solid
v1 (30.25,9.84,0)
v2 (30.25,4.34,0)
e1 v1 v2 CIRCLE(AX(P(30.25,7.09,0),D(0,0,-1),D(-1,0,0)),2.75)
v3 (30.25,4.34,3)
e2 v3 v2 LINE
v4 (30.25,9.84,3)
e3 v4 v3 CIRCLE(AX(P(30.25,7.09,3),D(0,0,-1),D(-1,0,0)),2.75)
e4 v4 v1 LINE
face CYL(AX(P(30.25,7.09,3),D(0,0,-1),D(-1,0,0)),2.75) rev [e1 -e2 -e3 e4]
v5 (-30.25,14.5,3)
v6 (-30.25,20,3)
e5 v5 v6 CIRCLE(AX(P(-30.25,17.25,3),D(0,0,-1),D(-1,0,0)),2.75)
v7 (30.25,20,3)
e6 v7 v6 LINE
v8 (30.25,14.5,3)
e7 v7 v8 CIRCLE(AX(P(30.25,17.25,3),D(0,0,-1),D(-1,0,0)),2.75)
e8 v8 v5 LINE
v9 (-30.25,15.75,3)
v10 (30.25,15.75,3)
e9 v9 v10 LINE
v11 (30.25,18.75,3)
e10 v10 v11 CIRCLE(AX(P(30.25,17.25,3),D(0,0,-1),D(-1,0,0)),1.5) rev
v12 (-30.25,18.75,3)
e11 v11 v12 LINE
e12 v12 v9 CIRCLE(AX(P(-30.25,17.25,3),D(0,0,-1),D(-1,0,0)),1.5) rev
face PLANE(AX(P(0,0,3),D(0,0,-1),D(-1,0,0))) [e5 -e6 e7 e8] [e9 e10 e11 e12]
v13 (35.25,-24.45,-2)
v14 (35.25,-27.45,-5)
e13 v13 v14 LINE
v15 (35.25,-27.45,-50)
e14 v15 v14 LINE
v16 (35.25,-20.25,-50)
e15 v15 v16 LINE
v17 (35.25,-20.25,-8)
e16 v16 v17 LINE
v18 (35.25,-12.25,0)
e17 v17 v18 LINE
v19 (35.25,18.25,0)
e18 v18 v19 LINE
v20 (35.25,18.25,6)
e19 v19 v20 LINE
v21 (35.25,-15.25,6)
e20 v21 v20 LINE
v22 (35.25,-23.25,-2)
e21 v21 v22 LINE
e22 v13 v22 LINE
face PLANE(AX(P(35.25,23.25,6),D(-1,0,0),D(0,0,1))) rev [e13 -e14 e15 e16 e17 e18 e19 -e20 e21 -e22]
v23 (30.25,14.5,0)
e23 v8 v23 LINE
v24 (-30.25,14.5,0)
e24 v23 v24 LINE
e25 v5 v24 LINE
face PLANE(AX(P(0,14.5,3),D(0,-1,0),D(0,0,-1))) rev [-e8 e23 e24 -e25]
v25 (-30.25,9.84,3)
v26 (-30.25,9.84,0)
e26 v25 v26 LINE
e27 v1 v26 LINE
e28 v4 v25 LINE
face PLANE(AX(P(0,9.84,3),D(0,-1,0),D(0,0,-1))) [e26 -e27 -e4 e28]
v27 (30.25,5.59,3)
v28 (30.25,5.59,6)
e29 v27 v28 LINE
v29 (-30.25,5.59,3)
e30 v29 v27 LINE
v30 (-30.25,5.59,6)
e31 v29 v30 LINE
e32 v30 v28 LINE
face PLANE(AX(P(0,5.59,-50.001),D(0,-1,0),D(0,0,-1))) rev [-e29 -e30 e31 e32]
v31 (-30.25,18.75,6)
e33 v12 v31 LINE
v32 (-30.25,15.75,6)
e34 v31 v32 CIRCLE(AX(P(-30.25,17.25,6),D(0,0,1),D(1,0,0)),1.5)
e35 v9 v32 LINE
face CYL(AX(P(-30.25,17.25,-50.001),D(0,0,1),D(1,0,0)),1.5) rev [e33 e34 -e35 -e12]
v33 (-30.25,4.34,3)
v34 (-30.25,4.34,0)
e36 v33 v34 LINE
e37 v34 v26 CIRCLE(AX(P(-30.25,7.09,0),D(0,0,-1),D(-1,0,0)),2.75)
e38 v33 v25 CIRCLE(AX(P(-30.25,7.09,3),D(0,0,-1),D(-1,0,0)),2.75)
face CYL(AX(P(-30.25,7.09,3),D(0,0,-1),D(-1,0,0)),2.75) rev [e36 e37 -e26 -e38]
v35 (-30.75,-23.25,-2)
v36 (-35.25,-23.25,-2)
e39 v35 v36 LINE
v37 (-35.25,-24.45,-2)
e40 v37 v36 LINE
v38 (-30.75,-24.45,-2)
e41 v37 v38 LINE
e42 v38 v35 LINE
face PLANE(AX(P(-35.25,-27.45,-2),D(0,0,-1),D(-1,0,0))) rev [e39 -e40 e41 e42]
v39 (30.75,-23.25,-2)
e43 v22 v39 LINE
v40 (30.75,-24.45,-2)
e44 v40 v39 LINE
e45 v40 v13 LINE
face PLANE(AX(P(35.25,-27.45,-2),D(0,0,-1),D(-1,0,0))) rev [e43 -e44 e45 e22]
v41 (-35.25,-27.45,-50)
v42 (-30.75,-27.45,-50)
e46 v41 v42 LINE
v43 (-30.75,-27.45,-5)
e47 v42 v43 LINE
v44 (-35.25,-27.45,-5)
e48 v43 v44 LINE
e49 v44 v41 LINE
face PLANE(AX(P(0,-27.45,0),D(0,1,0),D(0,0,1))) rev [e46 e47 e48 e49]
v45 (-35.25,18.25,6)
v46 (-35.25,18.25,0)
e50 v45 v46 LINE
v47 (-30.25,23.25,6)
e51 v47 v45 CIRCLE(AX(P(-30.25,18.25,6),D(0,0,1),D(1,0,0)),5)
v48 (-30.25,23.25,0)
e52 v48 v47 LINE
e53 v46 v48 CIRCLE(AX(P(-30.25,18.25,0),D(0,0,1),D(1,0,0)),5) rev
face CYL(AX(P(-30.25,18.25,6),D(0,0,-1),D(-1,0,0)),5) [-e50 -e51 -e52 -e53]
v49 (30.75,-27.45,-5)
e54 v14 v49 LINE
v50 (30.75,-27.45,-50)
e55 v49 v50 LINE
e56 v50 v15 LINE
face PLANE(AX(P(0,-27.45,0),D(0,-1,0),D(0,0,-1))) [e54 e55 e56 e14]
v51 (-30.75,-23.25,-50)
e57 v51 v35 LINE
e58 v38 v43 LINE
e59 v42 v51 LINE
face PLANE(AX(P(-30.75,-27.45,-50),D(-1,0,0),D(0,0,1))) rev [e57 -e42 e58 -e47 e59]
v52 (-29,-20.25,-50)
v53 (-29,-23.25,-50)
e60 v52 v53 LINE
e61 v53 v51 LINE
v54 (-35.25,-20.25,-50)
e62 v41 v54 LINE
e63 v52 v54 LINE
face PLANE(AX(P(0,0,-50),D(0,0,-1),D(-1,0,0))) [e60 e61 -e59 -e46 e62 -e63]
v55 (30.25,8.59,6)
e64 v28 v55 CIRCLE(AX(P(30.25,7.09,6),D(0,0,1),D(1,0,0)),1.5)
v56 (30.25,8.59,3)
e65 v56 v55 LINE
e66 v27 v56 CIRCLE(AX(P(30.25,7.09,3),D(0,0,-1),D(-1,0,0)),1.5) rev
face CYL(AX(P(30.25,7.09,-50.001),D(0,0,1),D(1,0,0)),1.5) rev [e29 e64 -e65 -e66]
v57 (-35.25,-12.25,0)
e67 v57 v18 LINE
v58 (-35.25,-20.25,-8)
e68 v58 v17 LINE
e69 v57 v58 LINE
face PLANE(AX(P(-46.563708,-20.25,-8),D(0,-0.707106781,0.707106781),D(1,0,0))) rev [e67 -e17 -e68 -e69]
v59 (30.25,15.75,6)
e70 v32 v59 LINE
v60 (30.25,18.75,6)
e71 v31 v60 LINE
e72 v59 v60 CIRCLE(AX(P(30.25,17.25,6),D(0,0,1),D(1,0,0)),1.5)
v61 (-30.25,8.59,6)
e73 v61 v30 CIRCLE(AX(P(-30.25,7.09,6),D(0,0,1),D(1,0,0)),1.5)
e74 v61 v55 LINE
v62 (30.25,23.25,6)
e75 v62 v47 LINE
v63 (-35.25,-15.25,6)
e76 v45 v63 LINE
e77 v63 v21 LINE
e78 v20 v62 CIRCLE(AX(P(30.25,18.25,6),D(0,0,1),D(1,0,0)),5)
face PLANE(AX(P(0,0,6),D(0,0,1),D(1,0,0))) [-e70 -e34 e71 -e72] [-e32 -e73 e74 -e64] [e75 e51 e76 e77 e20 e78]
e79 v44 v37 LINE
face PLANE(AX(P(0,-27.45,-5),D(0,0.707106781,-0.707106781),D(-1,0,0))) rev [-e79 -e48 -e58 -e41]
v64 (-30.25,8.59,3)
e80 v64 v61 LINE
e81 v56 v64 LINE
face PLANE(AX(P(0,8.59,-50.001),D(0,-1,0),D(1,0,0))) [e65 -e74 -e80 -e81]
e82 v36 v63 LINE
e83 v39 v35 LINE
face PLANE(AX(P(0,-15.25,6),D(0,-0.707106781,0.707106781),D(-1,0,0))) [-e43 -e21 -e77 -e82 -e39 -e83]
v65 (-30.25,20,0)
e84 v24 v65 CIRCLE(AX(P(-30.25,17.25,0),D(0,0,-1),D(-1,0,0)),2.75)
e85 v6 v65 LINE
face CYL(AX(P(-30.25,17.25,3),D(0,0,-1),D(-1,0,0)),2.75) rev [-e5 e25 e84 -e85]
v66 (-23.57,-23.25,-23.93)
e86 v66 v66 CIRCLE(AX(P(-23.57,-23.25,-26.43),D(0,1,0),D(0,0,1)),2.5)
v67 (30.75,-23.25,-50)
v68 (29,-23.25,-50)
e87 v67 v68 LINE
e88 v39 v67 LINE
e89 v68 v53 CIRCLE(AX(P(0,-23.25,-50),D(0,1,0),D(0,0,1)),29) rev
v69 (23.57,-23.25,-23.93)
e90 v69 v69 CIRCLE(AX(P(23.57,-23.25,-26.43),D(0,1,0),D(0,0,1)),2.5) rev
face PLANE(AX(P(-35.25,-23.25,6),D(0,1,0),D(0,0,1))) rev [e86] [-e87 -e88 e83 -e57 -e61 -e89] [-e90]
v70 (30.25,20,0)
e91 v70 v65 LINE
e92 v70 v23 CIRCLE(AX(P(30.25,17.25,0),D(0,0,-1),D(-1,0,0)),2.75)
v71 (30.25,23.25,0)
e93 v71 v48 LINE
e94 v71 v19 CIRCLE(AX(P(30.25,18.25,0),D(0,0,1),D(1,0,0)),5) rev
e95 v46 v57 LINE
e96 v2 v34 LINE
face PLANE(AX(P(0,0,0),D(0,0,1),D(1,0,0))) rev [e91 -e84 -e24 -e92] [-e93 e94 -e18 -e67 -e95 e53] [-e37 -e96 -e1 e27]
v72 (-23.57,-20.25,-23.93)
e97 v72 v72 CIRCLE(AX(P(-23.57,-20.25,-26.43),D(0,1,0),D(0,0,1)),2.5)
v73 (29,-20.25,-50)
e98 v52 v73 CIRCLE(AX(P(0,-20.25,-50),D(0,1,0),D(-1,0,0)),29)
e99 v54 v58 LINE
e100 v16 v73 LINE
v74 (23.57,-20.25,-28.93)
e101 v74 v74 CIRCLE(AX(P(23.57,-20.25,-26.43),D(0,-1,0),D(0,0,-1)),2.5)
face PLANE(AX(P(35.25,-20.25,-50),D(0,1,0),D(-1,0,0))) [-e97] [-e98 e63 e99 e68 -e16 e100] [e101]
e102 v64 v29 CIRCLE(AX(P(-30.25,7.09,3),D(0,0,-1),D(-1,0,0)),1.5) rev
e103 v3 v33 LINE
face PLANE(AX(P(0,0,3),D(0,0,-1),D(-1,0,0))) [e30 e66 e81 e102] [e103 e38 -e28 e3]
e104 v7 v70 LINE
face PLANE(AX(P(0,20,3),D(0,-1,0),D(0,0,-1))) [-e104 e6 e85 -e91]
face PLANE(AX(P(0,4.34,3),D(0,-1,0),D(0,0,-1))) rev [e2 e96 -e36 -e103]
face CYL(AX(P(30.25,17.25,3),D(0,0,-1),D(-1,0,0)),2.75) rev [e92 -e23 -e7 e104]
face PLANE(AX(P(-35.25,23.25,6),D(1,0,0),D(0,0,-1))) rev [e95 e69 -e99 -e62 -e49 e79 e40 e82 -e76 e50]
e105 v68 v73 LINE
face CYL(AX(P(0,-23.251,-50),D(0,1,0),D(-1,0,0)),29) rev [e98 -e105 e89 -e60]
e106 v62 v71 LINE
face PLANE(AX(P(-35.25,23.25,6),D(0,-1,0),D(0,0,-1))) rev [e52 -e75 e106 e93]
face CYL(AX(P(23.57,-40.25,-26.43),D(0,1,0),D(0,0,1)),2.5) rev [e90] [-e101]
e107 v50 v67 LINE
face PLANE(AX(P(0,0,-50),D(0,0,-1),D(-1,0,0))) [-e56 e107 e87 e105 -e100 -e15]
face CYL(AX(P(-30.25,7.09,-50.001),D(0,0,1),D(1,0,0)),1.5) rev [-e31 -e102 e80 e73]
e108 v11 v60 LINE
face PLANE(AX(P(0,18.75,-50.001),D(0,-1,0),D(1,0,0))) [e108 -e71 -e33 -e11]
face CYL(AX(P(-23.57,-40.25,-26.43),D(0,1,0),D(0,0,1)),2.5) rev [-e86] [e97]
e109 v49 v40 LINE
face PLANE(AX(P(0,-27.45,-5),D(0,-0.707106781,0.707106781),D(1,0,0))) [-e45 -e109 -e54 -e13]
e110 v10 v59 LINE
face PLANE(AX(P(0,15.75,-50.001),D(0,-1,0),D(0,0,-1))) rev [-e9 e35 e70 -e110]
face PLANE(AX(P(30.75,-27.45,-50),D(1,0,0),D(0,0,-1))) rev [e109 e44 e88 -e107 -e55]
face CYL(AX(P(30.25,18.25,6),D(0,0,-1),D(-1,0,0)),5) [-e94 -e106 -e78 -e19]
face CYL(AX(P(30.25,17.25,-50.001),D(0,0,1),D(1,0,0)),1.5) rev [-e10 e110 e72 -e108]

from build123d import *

# Parameters (mm, degrees)
SKETCH1_W           = 70.5
SKETCH1_H           = 46.5
BOSS_EXTRUDE1_DEPTH = 6
SKETCH2_W           = 70.5
SKETCH2_H           = 3
BOSS_EXTRUDE2_DEPTH = 50
CUT_EXTRUDE1_REACH  = 77.065
SKETCH3_R           = 29
SKETCH4_W           = 8
SKETCH4_H           = 8
BOSS_EXTRUDE3_DEPTH = 70.5
CHAMFER1_SIZE       = 8
SKETCH5_R           = 2.5
CUT_EXTRUDE2_DEPTH  = 20
SKETCH6_W           = 4.5
SKETCH6_H           = 48
BOSS_EXTRUDE4_DEPTH = 4.2
CHAMFER2_SIZE       = 3
CUT_EXTRUDE3_REACH  = 73.638
CUT_EXTRUDE4_START  = -3
CUT_EXTRUDE4_DEPTH  = 3
FILLET1_R           = 5


with BuildPart() as part:
    # Sketch1 → Boss-Extrude1 (new body)
    with BuildSketch(Plane.XY):
        Rectangle(SKETCH1_W, SKETCH1_H)
    extrude(amount=BOSS_EXTRUDE1_DEPTH)

    # Sketch2 → Boss-Extrude2 (add)
    with BuildSketch(Plane(origin=(0, 0, 0), x_dir=(-1, 0, 0), z_dir=(0, 0, -1))):
        with Locations((0, -21.75)):
            Rectangle(SKETCH2_W, SKETCH2_H)
    extrude(amount=BOSS_EXTRUDE2_DEPTH)

    # Sketch3 → Cut-Extrude1 (cut, up to next)
    with BuildSketch(Plane(origin=(0, -20.25, 0), x_dir=(1, 0, 0), z_dir=(0, 1, 0)), mode=Mode.PRIVATE) as cut_extrude1_sk1:
        with Locations((0, 50)):
            Circle(SKETCH3_R)
    cut_extrude1_tool1 = extrude(cut_extrude1_sk1.sketch, amount=-CUT_EXTRUDE1_REACH, mode=Mode.PRIVATE) & part.part
    add(cut_extrude1_tool1.solids().sort_by_distance((0, -20.25, -50))[0], mode=Mode.SUBTRACT)

    # Sketch4 → Boss-Extrude3 (add)
    with BuildSketch(Plane(origin=(35.25, 0, 0), x_dir=(0, 0, -1), z_dir=(1, 0, 0))):
        with Locations((4, -16.25)):
            Rectangle(SKETCH4_W, SKETCH4_H)
    extrude(amount=-BOSS_EXTRUDE3_DEPTH)

    # Chamfer1
    chamfer1_edges = [part.edges().sort_by_distance(p)[0] for p in [
        (0, -12.25, -8),
        (0, -23.25, 6),
    ]]
    chamfer(chamfer1_edges, length=CHAMFER1_SIZE - 0.0001)  # a hair under: the kernel refuses the full size

    # Sketch5 → Cut-Extrude2 (cut)
    with BuildSketch(Plane(origin=(0, -20.25, 0), x_dir=(1, 0, 0), z_dir=(0, 1, 0))):
        with Locations(Location((-23.57, 26.43, 0), (0, 0, 270))):
            Circle(SKETCH5_R)
        with Locations(Location((23.57, 26.43, 0), (0, 0, 270))):
            Circle(SKETCH5_R)
    extrude(amount=-CUT_EXTRUDE2_DEPTH, mode=Mode.SUBTRACT)

    # Sketch6 → Boss-Extrude4 (add)
    with BuildSketch(Plane.XZ.offset(23.25)):
        with Locations((-33, -26)):
            Rectangle(SKETCH6_W, SKETCH6_H)
        with Locations((33, -26)):
            Rectangle(SKETCH6_W, SKETCH6_H)
    extrude(amount=BOSS_EXTRUDE4_DEPTH)

    # Chamfer2
    chamfer2_edges = [part.edges().sort_by_distance(p)[0] for p in [
        (-33, -27.45, -2),
        (33, -27.45, -2),
    ]]
    chamfer(chamfer2_edges, length=CHAMFER2_SIZE)

    # Sketch7 → Cut-Extrude3 (cut, up to next)
    with BuildSketch(Plane.XY.offset(6), mode=Mode.PRIVATE) as cut_extrude3_sk1:
        with BuildLine():
            ThreePointArc((-28.75, 17.25), (-29.189339828, 18.310660172), (-30.25, 18.75))
            Line((-30.25, 18.75), (-30.25, 15.75))
            ThreePointArc((-30.25, 15.75), (-29.189339828, 16.189339828), (-28.75, 17.25))
        make_face()
    cut_extrude3_tool1 = extrude(cut_extrude3_sk1.sketch, amount=-CUT_EXTRUDE3_REACH, mode=Mode.PRIVATE) & part.part
    # Sketch7 → Cut-Extrude3 (cut, up to next)
    with BuildSketch(Plane.XY.offset(6), mode=Mode.PRIVATE) as cut_extrude3_sk2:
        with BuildLine():
            Line((-30.25, 15.75), (-30.25, 18.75))
            ThreePointArc((-30.25, 18.75), (-31.75, 17.25), (-30.25, 15.75))
        make_face()
    cut_extrude3_tool2 = extrude(cut_extrude3_sk2.sketch, amount=-CUT_EXTRUDE3_REACH, mode=Mode.PRIVATE) & part.part
    # Sketch7 → Cut-Extrude3 (cut, up to next)
    with BuildSketch(Plane.XY.offset(6), mode=Mode.PRIVATE) as cut_extrude3_sk3:
        with BuildLine():
            ThreePointArc((-28.75, 17.25), (-29.189339828, 18.310660172), (-30.25, 18.75))
            Line((-30.25, 18.75), (-30.25, 15.75))
            ThreePointArc((-30.25, 15.75), (-29.189339828, 16.189339828), (-28.75, 17.25))
        make_face()
    cut_extrude3_tool3 = extrude(cut_extrude3_sk3.sketch, amount=-CUT_EXTRUDE3_REACH, mode=Mode.PRIVATE) & part.part
    # Sketch7 → Cut-Extrude3 (cut, up to next)
    with BuildSketch(Plane.XY.offset(6), mode=Mode.PRIVATE) as cut_extrude3_sk4:
        with BuildLine():
            Line((-30.25, 15.75), (-30.25, 18.75))
            ThreePointArc((-30.25, 18.75), (-31.75, 17.25), (-30.25, 15.75))
        make_face()
    cut_extrude3_tool4 = extrude(cut_extrude3_sk4.sketch, amount=-CUT_EXTRUDE3_REACH, mode=Mode.PRIVATE) & part.part
    # Sketch7 → Cut-Extrude3 (cut, up to next)
    with BuildSketch(Plane.XY.offset(6), mode=Mode.PRIVATE) as cut_extrude3_sk5:
        with BuildLine():
            Line((30.25, 18.75), (-30.25, 18.75))
            ThreePointArc((-30.25, 18.75), (-29.189339828, 18.310660172), (-28.75, 17.25))
            ThreePointArc((-28.75, 17.25), (-29.189339828, 16.189339828), (-30.25, 15.75))
            Line((-30.25, 15.75), (30.25, 15.75))
            ThreePointArc((30.25, 15.75), (28.75, 17.25), (30.25, 18.75))
        make_face()
    cut_extrude3_tool5 = extrude(cut_extrude3_sk5.sketch, amount=-CUT_EXTRUDE3_REACH, mode=Mode.PRIVATE) & part.part
    # Sketch7 → Cut-Extrude3 (cut, up to next)
    with BuildSketch(Plane.XY.offset(6), mode=Mode.PRIVATE) as cut_extrude3_sk6:
        with BuildLine():
            ThreePointArc((-28.75, 7.09), (-29.189339828, 8.150660172), (-30.25, 8.59))
            Line((-30.25, 8.59), (-30.25, 5.59))
            ThreePointArc((-30.25, 5.59), (-29.189339828, 6.029339828), (-28.75, 7.09))
        make_face()
    cut_extrude3_tool6 = extrude(cut_extrude3_sk6.sketch, amount=-CUT_EXTRUDE3_REACH, mode=Mode.PRIVATE) & part.part
    # Sketch7 → Cut-Extrude3 (cut, up to next)
    with BuildSketch(Plane.XY.offset(6), mode=Mode.PRIVATE) as cut_extrude3_sk7:
        with BuildLine():
            Line((-30.25, 5.59), (-30.25, 8.59))
            ThreePointArc((-30.25, 8.59), (-31.75, 7.09), (-30.25, 5.59))
        make_face()
    cut_extrude3_tool7 = extrude(cut_extrude3_sk7.sketch, amount=-CUT_EXTRUDE3_REACH, mode=Mode.PRIVATE) & part.part
    # Sketch7 → Cut-Extrude3 (cut, up to next)
    with BuildSketch(Plane.XY.offset(6), mode=Mode.PRIVATE) as cut_extrude3_sk8:
        with BuildLine():
            ThreePointArc((-28.75, 7.09), (-29.189339828, 8.150660172), (-30.25, 8.59))
            Line((-30.25, 8.59), (-30.25, 5.59))
            ThreePointArc((-30.25, 5.59), (-29.189339828, 6.029339828), (-28.75, 7.09))
        make_face()
    cut_extrude3_tool8 = extrude(cut_extrude3_sk8.sketch, amount=-CUT_EXTRUDE3_REACH, mode=Mode.PRIVATE) & part.part
    # Sketch7 → Cut-Extrude3 (cut, up to next)
    with BuildSketch(Plane.XY.offset(6), mode=Mode.PRIVATE) as cut_extrude3_sk9:
        with BuildLine():
            Line((-30.25, 5.59), (-30.25, 8.59))
            ThreePointArc((-30.25, 8.59), (-31.75, 7.09), (-30.25, 5.59))
        make_face()
    cut_extrude3_tool9 = extrude(cut_extrude3_sk9.sketch, amount=-CUT_EXTRUDE3_REACH, mode=Mode.PRIVATE) & part.part
    # Sketch7 → Cut-Extrude3 (cut, up to next)
    with BuildSketch(Plane.XY.offset(6), mode=Mode.PRIVATE) as cut_extrude3_sk10:
        with BuildLine():
            Line((30.25, 8.59), (-30.25, 8.59))
            ThreePointArc((-30.25, 8.59), (-29.189339828, 8.150660172), (-28.75, 7.09))
            ThreePointArc((-28.75, 7.09), (-29.189339828, 6.029339828), (-30.25, 5.59))
            Line((-30.25, 5.59), (30.25, 5.59))
            ThreePointArc((30.25, 5.59), (28.75, 7.09), (30.25, 8.59))
        make_face()
    cut_extrude3_tool10 = extrude(cut_extrude3_sk10.sketch, amount=-CUT_EXTRUDE3_REACH, mode=Mode.PRIVATE) & part.part
    # Sketch7 → Cut-Extrude3 (cut, up to next)
    with BuildSketch(Plane.XY.offset(6), mode=Mode.PRIVATE) as cut_extrude3_sk11:
        with BuildLine():
            ThreePointArc((31.75, 17.25), (31.310660172, 18.310660172), (30.25, 18.75))
            Line((30.25, 18.75), (30.25, 15.75))
            ThreePointArc((30.25, 15.75), (31.310660172, 16.189339828), (31.75, 17.25))
        make_face()
    cut_extrude3_tool11 = extrude(cut_extrude3_sk11.sketch, amount=-CUT_EXTRUDE3_REACH, mode=Mode.PRIVATE) & part.part
    # Sketch7 → Cut-Extrude3 (cut, up to next)
    with BuildSketch(Plane.XY.offset(6), mode=Mode.PRIVATE) as cut_extrude3_sk12:
        with BuildLine():
            Line((30.25, 15.75), (30.25, 18.75))
            ThreePointArc((30.25, 18.75), (28.75, 17.25), (30.25, 15.75))
        make_face()
    cut_extrude3_tool12 = extrude(cut_extrude3_sk12.sketch, amount=-CUT_EXTRUDE3_REACH, mode=Mode.PRIVATE) & part.part
    # Sketch7 → Cut-Extrude3 (cut, up to next)
    with BuildSketch(Plane.XY.offset(6), mode=Mode.PRIVATE) as cut_extrude3_sk13:
        with BuildLine():
            ThreePointArc((31.75, 17.25), (31.310660172, 18.310660172), (30.25, 18.75))
            Line((30.25, 18.75), (30.25, 15.75))
            ThreePointArc((30.25, 15.75), (31.310660172, 16.189339828), (31.75, 17.25))
        make_face()
    cut_extrude3_tool13 = extrude(cut_extrude3_sk13.sketch, amount=-CUT_EXTRUDE3_REACH, mode=Mode.PRIVATE) & part.part
    # Sketch7 → Cut-Extrude3 (cut, up to next)
    with BuildSketch(Plane.XY.offset(6), mode=Mode.PRIVATE) as cut_extrude3_sk14:
        with BuildLine():
            Line((30.25, 15.75), (30.25, 18.75))
            ThreePointArc((30.25, 18.75), (28.75, 17.25), (30.25, 15.75))
        make_face()
    cut_extrude3_tool14 = extrude(cut_extrude3_sk14.sketch, amount=-CUT_EXTRUDE3_REACH, mode=Mode.PRIVATE) & part.part
    # Sketch7 → Cut-Extrude3 (cut, up to next)
    with BuildSketch(Plane.XY.offset(6), mode=Mode.PRIVATE) as cut_extrude3_sk15:
        with BuildLine():
            ThreePointArc((31.75, 7.09), (31.310660172, 8.150660172), (30.25, 8.59))
            Line((30.25, 8.59), (30.25, 5.59))
            ThreePointArc((30.25, 5.59), (31.310660172, 6.029339828), (31.75, 7.09))
        make_face()
    cut_extrude3_tool15 = extrude(cut_extrude3_sk15.sketch, amount=-CUT_EXTRUDE3_REACH, mode=Mode.PRIVATE) & part.part
    # Sketch7 → Cut-Extrude3 (cut, up to next)
    with BuildSketch(Plane.XY.offset(6), mode=Mode.PRIVATE) as cut_extrude3_sk16:
        with BuildLine():
            Line((30.25, 5.59), (30.25, 8.59))
            ThreePointArc((30.25, 8.59), (28.75, 7.09), (30.25, 5.59))
        make_face()
    cut_extrude3_tool16 = extrude(cut_extrude3_sk16.sketch, amount=-CUT_EXTRUDE3_REACH, mode=Mode.PRIVATE) & part.part
    # Sketch7 → Cut-Extrude3 (cut, up to next)
    with BuildSketch(Plane.XY.offset(6), mode=Mode.PRIVATE) as cut_extrude3_sk17:
        with BuildLine():
            ThreePointArc((31.75, 7.09), (31.310660172, 8.150660172), (30.25, 8.59))
            Line((30.25, 8.59), (30.25, 5.59))
            ThreePointArc((30.25, 5.59), (31.310660172, 6.029339828), (31.75, 7.09))
        make_face()
    cut_extrude3_tool17 = extrude(cut_extrude3_sk17.sketch, amount=-CUT_EXTRUDE3_REACH, mode=Mode.PRIVATE) & part.part
    # Sketch7 → Cut-Extrude3 (cut, up to next)
    with BuildSketch(Plane.XY.offset(6), mode=Mode.PRIVATE) as cut_extrude3_sk18:
        with BuildLine():
            Line((30.25, 5.59), (30.25, 8.59))
            ThreePointArc((30.25, 8.59), (28.75, 7.09), (30.25, 5.59))
        make_face()
    cut_extrude3_tool18 = extrude(cut_extrude3_sk18.sketch, amount=-CUT_EXTRUDE3_REACH, mode=Mode.PRIVATE) & part.part
    add(cut_extrude3_tool1.solids().sort_by_distance((-29.61338, 17.25, 6))[0], mode=Mode.SUBTRACT)
    add(cut_extrude3_tool2.solids().sort_by_distance((-30.88662, 17.25, 6))[0], mode=Mode.SUBTRACT)
    add(cut_extrude3_tool3.solids().sort_by_distance((-29.61338, 17.25, 6))[0], mode=Mode.SUBTRACT)
    add(cut_extrude3_tool4.solids().sort_by_distance((-30.88662, 17.25, 6))[0], mode=Mode.SUBTRACT)
    add(cut_extrude3_tool5.solids().sort_by_distance((0, 17.25, 6))[0], mode=Mode.SUBTRACT)
    add(cut_extrude3_tool6.solids().sort_by_distance((-29.61338, 7.09, 6))[0], mode=Mode.SUBTRACT)
    add(cut_extrude3_tool7.solids().sort_by_distance((-30.88662, 7.09, 6))[0], mode=Mode.SUBTRACT)
    add(cut_extrude3_tool8.solids().sort_by_distance((-29.61338, 7.09, 6))[0], mode=Mode.SUBTRACT)
    add(cut_extrude3_tool9.solids().sort_by_distance((-30.88662, 7.09, 6))[0], mode=Mode.SUBTRACT)
    add(cut_extrude3_tool10.solids().sort_by_distance((0, 7.09, 6))[0], mode=Mode.SUBTRACT)
    add(cut_extrude3_tool11.solids().sort_by_distance((30.88662, 17.25, 6))[0], mode=Mode.SUBTRACT)
    add(cut_extrude3_tool12.solids().sort_by_distance((29.61338, 17.25, 6))[0], mode=Mode.SUBTRACT)
    add(cut_extrude3_tool13.solids().sort_by_distance((30.88662, 17.25, 6))[0], mode=Mode.SUBTRACT)
    add(cut_extrude3_tool14.solids().sort_by_distance((29.61338, 17.25, 6))[0], mode=Mode.SUBTRACT)
    add(cut_extrude3_tool15.solids().sort_by_distance((30.88662, 7.09, 6))[0], mode=Mode.SUBTRACT)
    add(cut_extrude3_tool16.solids().sort_by_distance((29.61338, 7.09, 6))[0], mode=Mode.SUBTRACT)
    add(cut_extrude3_tool17.solids().sort_by_distance((30.88662, 7.09, 6))[0], mode=Mode.SUBTRACT)
    add(cut_extrude3_tool18.solids().sort_by_distance((29.61338, 7.09, 6))[0], mode=Mode.SUBTRACT)

    # Sketch8 → Cut-Extrude4 (cut)
    # profile 1 of 2: a face of its own
    with BuildSketch(Plane(origin=(0, 0, 0), x_dir=(-1, 0, 0), z_dir=(0, 0, -1)).offset(CUT_EXTRUDE4_START)):
        with BuildLine():
            ThreePointArc((30.25, 4.34), (33, 7.09), (30.25, 9.84))
            Line((30.25, 9.84), (-30.25, 9.84))
            ThreePointArc((-30.25, 9.84), (-33, 7.09), (-30.25, 4.34))
            Line((-30.25, 4.34), (30.25, 4.34))
        make_face()
        with BuildLine():
            ThreePointArc((-30.25, 5.59), (-31.75, 7.09), (-30.25, 8.59))
            Line((-30.25, 8.59), (30.25, 8.59))
            ThreePointArc((30.25, 8.59), (31.75, 7.09), (30.25, 5.59))
            Line((30.25, 5.59), (-30.25, 5.59))
        make_face(mode=Mode.SUBTRACT)
    # profile 2 of 2: a face of its own
    with BuildSketch(Plane(origin=(0, 0, 0), x_dir=(-1, 0, 0), z_dir=(0, 0, -1)).offset(CUT_EXTRUDE4_START)):
        with BuildLine():
            ThreePointArc((30.25, 14.5), (33, 17.25), (30.25, 20))
            Line((30.25, 20), (-30.25, 20))
            ThreePointArc((-30.25, 20), (-33, 17.25), (-30.25, 14.5))
            Line((-30.25, 14.5), (30.25, 14.5))
        make_face()
        with BuildLine():
            ThreePointArc((-30.25, 15.75), (-31.75, 17.25), (-30.25, 18.75))
            Line((-30.25, 18.75), (30.25, 18.75))
            ThreePointArc((30.25, 18.75), (31.75, 17.25), (30.25, 15.75))
            Line((30.25, 15.75), (-30.25, 15.75))
        make_face(mode=Mode.SUBTRACT)
    extrude(amount=CUT_EXTRUDE4_DEPTH, mode=Mode.SUBTRACT)

    # Fillet1
    fillet1_edges = [part.edges().sort_by_distance(p)[0] for p in [
        (-35.25, 23.25, 3),
        (35.25, 23.25, 3),
    ]]
    fillet(fillet1_edges, radius=FILLET1_R)


solid = part.part
